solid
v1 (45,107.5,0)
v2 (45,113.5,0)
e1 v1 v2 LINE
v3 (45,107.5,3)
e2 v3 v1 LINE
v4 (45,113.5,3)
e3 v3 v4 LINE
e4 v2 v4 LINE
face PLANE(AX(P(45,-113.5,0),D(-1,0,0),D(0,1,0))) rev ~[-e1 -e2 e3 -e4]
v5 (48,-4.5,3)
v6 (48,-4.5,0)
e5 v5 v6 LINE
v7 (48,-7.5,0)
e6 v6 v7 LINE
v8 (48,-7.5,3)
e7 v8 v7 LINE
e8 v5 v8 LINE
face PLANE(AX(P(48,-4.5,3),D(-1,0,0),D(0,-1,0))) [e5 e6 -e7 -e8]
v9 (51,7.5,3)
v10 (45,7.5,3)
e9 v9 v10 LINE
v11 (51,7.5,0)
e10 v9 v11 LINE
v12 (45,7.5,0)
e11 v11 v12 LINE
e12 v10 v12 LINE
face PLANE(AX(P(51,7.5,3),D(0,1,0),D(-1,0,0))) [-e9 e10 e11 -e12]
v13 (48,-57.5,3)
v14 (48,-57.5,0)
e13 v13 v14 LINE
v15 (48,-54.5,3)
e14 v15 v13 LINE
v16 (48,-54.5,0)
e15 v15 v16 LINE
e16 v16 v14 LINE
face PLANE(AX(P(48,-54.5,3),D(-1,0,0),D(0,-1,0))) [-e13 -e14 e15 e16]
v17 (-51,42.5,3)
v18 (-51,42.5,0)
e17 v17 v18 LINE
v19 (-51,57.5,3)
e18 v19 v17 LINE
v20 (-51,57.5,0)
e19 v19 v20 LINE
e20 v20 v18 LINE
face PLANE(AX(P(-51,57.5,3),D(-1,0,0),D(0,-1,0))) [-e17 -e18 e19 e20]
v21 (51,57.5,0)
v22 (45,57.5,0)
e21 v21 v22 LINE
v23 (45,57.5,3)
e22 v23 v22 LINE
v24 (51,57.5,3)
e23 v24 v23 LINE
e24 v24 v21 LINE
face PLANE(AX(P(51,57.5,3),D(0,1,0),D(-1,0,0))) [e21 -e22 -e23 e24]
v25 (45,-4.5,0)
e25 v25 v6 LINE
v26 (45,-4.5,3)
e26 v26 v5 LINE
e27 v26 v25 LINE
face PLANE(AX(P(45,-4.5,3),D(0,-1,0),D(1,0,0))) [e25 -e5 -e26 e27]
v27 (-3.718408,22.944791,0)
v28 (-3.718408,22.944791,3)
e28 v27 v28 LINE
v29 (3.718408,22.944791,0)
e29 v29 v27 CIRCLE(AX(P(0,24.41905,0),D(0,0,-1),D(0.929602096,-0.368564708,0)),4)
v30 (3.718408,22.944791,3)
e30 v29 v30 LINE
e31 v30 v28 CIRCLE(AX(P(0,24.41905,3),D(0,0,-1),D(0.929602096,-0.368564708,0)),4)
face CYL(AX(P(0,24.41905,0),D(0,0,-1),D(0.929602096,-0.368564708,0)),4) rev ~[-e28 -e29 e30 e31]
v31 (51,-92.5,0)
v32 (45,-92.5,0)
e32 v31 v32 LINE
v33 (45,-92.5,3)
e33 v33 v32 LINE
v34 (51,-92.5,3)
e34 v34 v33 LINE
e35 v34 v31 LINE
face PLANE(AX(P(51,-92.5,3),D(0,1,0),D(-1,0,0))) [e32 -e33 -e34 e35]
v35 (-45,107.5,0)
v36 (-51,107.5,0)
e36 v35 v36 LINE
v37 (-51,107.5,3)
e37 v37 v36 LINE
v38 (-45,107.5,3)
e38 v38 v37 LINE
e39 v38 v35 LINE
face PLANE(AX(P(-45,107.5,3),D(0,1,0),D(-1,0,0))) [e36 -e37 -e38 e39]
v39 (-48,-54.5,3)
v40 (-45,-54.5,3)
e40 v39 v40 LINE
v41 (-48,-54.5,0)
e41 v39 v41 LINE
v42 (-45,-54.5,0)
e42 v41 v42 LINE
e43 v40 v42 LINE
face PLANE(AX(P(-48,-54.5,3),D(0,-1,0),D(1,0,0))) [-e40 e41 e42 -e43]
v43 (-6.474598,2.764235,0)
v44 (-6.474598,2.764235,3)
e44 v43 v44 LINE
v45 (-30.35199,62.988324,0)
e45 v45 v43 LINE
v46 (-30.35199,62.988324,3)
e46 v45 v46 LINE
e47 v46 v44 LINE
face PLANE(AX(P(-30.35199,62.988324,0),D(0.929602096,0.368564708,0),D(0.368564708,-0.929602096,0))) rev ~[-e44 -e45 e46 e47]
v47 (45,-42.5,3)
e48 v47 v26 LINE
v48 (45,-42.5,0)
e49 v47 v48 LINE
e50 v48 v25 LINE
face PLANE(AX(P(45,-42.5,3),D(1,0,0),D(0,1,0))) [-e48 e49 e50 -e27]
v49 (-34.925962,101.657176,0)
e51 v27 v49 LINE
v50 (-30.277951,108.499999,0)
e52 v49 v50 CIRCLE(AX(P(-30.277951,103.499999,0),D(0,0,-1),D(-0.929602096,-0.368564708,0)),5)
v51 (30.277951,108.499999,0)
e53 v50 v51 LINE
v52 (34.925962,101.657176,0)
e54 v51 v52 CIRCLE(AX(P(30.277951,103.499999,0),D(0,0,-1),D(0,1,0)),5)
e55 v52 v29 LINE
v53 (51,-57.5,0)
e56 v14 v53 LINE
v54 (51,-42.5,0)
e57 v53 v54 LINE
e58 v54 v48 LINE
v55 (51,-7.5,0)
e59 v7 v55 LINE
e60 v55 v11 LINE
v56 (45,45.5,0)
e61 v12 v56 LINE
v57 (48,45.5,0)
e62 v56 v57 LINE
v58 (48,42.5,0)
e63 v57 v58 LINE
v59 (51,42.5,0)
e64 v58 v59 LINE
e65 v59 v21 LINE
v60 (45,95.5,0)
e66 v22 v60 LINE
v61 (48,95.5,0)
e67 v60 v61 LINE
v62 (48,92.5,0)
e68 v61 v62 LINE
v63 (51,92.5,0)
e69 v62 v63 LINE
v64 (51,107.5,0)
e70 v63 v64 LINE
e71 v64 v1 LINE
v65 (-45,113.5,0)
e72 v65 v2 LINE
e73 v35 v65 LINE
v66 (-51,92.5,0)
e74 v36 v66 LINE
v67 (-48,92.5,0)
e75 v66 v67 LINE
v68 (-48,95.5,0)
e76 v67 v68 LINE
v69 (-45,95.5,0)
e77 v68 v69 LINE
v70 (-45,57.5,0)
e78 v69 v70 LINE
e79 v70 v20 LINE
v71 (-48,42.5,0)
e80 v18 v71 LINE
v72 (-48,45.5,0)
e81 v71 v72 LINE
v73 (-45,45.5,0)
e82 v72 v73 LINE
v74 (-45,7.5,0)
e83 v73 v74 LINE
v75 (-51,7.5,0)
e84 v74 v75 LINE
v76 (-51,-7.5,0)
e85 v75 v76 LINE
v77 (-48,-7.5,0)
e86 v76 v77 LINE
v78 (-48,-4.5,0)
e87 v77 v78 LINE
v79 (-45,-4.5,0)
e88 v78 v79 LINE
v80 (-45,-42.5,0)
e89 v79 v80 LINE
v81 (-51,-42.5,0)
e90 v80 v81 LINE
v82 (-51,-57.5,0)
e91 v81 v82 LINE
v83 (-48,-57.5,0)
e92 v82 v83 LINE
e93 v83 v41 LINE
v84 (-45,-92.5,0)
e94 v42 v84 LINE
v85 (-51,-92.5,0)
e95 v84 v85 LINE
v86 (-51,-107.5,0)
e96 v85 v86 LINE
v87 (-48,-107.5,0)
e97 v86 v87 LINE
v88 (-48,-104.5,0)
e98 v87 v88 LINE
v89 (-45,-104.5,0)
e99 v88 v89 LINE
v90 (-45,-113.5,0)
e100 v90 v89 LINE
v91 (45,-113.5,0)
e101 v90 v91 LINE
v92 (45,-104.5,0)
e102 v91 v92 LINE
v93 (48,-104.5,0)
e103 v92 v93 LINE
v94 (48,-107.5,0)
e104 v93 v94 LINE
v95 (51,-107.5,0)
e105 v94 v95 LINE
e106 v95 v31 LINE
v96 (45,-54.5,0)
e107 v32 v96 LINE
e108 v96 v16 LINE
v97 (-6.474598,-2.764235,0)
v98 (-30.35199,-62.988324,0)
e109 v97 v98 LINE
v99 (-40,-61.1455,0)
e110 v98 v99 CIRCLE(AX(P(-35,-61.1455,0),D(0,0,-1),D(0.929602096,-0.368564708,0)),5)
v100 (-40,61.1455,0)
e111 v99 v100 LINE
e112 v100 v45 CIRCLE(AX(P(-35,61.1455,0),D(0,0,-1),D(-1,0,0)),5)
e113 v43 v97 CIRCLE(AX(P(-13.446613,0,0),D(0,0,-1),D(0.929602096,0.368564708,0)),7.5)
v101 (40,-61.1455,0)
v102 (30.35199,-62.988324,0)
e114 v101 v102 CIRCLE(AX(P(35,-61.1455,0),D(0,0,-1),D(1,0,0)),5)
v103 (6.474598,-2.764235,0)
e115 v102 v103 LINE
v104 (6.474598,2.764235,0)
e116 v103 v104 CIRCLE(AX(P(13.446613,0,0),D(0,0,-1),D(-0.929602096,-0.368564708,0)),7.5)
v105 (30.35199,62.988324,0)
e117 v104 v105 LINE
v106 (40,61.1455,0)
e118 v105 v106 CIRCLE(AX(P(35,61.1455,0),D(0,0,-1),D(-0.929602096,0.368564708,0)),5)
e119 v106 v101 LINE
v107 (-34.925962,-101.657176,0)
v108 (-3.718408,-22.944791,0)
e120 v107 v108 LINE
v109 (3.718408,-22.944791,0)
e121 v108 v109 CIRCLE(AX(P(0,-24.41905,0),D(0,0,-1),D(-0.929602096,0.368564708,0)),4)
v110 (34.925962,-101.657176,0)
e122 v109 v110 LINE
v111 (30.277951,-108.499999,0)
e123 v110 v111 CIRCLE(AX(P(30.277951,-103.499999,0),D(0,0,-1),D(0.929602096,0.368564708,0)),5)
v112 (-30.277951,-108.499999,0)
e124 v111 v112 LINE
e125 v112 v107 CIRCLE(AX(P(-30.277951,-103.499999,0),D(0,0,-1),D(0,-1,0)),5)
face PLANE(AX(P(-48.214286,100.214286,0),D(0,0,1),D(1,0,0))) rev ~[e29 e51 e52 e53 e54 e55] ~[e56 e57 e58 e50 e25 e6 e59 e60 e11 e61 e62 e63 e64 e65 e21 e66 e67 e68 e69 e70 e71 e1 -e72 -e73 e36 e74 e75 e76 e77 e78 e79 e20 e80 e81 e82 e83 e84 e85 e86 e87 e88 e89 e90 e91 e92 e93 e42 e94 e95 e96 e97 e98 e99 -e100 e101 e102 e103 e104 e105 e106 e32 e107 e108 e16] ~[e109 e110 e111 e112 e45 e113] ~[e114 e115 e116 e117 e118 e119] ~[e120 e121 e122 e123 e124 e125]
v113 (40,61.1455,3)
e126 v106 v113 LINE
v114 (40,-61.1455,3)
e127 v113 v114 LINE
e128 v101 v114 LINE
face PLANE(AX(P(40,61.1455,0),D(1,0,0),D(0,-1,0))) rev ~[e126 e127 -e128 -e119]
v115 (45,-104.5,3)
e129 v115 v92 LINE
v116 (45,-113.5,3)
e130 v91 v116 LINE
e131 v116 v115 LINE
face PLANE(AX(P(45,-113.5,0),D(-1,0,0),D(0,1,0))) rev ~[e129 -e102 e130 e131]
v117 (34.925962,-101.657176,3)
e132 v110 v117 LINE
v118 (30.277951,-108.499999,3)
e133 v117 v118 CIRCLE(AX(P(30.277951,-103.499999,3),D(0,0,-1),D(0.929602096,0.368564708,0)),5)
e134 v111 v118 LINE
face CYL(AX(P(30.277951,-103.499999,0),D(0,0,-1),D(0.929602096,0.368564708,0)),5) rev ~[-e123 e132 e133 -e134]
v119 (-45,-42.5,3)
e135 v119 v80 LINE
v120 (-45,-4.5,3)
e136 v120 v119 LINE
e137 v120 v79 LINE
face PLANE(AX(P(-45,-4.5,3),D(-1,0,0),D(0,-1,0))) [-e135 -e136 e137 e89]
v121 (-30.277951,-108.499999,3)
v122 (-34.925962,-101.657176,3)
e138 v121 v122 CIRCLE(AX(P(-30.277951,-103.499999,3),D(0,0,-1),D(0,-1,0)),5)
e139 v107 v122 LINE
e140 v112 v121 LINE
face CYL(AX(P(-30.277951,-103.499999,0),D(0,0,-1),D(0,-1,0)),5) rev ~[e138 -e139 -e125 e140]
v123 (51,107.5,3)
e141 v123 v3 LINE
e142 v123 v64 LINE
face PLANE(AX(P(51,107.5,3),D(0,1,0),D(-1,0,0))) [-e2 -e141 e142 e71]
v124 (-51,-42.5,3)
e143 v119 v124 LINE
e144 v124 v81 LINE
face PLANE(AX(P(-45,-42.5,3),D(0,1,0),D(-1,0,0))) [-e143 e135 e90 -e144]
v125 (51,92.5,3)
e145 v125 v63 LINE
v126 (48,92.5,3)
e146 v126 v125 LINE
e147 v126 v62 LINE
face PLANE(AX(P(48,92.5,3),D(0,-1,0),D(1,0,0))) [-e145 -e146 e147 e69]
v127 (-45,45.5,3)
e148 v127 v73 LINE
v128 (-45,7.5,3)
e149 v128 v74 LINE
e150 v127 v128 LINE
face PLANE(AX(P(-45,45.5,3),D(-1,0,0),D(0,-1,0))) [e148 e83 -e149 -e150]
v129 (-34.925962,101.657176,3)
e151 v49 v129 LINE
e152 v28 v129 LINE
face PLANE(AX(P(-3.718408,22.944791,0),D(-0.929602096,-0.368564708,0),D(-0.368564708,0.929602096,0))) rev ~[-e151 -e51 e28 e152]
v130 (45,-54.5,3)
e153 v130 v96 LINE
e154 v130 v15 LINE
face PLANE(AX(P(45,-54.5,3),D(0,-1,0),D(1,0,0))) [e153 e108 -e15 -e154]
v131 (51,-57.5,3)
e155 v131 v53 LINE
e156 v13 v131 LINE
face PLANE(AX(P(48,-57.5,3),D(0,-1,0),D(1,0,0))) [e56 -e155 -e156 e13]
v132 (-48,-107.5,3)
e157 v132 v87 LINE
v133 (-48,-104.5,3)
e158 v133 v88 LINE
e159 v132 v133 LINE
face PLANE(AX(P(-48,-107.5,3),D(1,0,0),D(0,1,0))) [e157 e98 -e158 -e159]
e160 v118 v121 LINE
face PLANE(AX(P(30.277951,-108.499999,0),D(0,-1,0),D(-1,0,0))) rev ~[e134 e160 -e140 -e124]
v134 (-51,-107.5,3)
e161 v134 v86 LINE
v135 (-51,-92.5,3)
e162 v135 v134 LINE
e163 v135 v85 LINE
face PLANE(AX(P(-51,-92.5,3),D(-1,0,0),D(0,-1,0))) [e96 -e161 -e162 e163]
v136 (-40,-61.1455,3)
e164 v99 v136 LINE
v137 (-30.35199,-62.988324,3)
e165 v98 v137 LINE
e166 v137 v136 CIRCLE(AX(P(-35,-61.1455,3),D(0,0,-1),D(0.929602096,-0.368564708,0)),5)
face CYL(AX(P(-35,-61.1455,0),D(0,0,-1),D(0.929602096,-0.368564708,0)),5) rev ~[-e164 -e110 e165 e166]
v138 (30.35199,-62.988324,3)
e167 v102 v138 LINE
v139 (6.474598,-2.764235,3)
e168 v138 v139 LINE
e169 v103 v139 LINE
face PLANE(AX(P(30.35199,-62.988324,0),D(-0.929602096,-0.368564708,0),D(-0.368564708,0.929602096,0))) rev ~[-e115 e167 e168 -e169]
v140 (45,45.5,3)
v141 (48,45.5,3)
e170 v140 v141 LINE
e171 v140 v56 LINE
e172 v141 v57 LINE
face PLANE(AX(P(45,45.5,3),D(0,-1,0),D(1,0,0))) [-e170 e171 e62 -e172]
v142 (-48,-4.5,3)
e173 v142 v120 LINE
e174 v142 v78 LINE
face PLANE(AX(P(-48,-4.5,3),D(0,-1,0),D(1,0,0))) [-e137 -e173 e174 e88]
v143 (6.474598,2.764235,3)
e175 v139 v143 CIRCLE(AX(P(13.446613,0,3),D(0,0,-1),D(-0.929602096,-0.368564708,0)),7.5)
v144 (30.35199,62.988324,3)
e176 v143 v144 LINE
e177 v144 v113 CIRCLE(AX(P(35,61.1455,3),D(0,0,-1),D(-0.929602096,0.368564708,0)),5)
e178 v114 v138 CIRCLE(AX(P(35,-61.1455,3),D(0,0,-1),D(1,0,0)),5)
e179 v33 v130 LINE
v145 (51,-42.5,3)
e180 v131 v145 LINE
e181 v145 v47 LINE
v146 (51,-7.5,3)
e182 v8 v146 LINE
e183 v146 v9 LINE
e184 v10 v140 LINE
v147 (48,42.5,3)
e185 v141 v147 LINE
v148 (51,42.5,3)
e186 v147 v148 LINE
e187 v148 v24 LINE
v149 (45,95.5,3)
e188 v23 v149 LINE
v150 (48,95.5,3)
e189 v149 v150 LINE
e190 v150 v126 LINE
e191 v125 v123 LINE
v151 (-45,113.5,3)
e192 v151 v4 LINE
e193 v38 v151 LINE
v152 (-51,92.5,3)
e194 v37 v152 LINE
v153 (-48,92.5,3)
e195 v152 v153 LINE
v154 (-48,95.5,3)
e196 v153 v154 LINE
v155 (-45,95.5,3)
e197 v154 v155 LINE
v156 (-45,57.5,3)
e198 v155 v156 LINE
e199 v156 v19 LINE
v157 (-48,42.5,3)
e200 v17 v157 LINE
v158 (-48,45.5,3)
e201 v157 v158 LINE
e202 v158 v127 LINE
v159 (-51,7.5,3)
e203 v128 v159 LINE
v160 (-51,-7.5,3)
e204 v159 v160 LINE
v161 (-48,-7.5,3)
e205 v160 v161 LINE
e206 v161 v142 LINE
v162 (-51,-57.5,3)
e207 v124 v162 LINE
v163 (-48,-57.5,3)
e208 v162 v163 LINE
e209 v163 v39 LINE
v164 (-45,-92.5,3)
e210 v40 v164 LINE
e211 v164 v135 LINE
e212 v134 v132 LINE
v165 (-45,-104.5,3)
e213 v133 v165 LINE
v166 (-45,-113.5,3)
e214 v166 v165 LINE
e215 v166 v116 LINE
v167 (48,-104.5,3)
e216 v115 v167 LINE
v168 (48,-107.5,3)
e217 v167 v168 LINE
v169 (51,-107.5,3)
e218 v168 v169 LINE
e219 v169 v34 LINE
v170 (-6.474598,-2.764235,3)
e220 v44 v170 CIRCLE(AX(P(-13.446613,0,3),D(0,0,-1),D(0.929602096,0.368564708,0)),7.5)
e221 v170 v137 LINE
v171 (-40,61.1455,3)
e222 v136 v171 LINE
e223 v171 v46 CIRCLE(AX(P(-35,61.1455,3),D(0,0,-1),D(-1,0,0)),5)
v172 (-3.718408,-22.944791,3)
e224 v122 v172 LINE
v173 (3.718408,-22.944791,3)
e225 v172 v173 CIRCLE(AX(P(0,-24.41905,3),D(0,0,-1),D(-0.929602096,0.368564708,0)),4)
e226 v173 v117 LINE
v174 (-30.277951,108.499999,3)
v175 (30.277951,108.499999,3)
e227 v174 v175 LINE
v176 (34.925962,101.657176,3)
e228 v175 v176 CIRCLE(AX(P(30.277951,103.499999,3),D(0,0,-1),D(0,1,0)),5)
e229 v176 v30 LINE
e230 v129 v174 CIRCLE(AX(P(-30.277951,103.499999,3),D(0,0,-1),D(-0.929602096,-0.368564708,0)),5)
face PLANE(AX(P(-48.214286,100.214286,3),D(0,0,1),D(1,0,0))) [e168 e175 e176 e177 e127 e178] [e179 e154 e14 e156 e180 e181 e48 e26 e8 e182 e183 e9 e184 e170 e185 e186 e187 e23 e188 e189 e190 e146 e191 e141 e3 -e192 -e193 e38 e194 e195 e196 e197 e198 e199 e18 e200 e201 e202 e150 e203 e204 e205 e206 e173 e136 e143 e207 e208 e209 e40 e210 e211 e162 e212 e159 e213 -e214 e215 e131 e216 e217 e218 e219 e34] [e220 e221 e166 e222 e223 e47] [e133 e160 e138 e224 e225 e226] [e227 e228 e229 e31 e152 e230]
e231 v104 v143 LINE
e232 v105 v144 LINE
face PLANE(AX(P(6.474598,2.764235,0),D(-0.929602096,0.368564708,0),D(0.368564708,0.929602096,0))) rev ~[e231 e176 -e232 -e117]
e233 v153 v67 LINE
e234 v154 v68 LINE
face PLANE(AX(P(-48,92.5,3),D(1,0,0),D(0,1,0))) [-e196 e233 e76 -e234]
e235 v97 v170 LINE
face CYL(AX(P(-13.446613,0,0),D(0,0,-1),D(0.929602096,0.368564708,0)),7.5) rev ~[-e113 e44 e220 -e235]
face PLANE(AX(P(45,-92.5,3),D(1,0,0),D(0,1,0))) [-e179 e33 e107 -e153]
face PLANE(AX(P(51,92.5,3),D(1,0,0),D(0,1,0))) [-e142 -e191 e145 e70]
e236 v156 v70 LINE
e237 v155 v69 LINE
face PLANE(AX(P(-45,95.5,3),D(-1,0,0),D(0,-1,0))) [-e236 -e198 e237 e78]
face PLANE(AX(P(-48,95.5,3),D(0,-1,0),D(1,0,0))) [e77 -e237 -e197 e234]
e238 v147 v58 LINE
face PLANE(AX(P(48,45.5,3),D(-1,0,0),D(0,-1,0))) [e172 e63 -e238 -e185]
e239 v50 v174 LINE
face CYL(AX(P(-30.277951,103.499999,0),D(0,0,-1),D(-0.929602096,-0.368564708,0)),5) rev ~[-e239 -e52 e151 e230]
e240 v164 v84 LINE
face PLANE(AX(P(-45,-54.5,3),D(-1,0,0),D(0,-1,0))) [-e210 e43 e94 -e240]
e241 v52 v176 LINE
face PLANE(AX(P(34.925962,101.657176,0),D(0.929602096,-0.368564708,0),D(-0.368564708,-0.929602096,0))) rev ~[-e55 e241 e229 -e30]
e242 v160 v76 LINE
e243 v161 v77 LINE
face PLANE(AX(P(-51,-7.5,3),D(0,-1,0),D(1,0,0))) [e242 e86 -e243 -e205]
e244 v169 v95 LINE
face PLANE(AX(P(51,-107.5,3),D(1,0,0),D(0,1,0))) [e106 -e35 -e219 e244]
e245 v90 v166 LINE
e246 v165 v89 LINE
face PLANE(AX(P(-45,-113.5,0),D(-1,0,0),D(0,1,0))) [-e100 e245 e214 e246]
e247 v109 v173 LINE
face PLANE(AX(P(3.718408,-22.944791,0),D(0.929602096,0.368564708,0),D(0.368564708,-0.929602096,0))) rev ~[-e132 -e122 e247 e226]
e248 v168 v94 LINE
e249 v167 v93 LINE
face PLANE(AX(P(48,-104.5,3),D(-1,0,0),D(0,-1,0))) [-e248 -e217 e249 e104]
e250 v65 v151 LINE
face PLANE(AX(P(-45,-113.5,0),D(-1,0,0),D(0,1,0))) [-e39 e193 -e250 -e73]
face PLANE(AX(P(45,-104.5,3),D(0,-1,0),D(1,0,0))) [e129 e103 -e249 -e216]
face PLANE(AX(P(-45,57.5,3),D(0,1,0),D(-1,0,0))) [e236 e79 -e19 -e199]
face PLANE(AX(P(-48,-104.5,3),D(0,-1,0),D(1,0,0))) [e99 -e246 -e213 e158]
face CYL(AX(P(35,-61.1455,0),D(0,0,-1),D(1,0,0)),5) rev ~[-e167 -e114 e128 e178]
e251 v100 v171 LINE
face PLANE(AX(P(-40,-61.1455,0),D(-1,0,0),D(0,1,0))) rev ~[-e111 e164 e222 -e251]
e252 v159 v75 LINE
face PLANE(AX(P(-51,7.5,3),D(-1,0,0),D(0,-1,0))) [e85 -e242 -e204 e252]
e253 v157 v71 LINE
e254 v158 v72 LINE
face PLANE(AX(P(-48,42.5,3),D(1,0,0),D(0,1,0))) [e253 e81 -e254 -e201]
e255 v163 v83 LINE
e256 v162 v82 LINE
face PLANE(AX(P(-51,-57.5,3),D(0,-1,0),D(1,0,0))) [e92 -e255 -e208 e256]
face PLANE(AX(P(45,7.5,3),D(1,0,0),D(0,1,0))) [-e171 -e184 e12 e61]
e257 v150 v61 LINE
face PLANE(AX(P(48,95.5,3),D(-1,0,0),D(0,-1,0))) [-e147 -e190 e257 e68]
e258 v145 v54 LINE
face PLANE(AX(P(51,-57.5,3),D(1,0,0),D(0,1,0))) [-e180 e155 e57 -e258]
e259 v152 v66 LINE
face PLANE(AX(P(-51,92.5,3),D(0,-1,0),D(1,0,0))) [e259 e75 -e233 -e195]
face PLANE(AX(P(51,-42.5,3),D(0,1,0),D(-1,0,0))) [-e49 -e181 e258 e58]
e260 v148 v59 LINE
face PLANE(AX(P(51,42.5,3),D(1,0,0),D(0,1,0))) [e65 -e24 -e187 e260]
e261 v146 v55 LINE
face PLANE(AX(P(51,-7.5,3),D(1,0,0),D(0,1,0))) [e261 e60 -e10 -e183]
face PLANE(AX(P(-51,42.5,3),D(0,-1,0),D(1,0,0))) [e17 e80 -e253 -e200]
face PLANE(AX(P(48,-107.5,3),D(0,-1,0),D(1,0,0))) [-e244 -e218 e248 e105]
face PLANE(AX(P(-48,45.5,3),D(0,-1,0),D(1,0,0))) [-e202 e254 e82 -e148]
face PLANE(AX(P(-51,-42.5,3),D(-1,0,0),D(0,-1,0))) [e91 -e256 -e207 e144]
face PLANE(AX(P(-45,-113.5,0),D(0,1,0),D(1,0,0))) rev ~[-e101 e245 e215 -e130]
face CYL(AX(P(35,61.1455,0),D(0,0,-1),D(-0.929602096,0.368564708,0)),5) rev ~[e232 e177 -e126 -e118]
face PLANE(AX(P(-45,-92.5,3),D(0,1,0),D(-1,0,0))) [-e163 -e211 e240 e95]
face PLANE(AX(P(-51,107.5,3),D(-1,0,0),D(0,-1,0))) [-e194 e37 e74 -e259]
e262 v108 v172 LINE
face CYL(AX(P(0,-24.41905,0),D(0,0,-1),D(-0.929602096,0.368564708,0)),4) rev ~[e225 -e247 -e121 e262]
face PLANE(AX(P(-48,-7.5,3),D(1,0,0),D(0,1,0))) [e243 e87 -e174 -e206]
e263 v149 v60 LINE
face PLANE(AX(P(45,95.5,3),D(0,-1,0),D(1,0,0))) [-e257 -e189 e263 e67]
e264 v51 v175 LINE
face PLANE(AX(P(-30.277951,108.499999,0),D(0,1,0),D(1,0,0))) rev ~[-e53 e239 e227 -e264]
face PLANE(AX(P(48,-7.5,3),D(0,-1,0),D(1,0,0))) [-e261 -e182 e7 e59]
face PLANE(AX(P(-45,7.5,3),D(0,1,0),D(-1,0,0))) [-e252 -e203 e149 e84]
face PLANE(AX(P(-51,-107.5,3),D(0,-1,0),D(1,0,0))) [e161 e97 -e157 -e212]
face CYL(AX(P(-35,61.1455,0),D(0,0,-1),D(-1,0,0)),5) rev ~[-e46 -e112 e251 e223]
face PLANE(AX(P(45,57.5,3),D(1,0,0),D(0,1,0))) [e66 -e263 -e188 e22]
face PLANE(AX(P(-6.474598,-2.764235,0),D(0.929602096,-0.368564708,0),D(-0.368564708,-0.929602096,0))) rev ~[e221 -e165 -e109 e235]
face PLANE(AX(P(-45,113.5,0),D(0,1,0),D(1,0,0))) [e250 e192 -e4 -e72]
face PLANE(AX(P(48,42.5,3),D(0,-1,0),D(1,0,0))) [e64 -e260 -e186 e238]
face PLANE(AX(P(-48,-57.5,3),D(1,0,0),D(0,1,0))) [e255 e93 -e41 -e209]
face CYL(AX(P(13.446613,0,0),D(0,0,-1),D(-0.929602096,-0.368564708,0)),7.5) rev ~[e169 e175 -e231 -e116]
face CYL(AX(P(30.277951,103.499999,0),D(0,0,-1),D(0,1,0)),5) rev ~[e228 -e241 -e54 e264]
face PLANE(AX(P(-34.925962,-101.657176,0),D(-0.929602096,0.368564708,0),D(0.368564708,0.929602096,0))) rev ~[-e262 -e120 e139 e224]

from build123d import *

# Parameters (mm, degrees)
F0_W     = 90
F0_H     = 227
F1_DEPTH = 3
F3_DEPTH = 3


# Not quite as in the source:
# - a feature names something its author has since deleted; it is built from what else it names


with BuildPart() as f1:
    # F0 (on Top) → F1 (new body)
    with BuildSketch(Plane.XY):
        Rectangle(F0_W, F0_H)
        with BuildLine():
            ThreePointArc((-30.2779513906, -108.4999991059), (-34.4140194322, -106.3094369778), (-34.9259618692, -101.6571755682))
            Line((-34.9259618692, -101.6571755682), (-3.7184084714, -22.9447908871))
            ThreePointArc((-3.7184084714, -22.9447908871), (-8.85e-08, -20.4190497173), (3.7184082943, -22.9447908871))
            Line((3.7184082943, -22.9447908871), (34.9259616921, -101.6571755682))
            ThreePointArc((34.9259616921, -101.6571755682), (34.4140192551, -106.3094369778), (30.2779512136, -108.4999991059))
            Line((30.2779512136, -108.4999991059), (-30.2779513906, -108.4999991059))
        make_face(mode=Mode.SUBTRACT)
        with BuildLine():
            ThreePointArc((-40, 61.145500066), (-35.9380691891, 66.0567143962), (-30.3519895215, 62.9883236038))
            Line((-30.3519895215, 62.9883236038), (-6.4745976856, 2.7642353066))
            ThreePointArc((-6.4745976856, 2.7642353066), (-5.9466134034, 0), (-6.4745976856, -2.7642353066))
            Line((-6.4745976856, -2.7642353066), (-30.3519895215, -62.9883236038))
            ThreePointArc((-30.3519895214, -62.9883236038), (-35.9380691891, -66.0567143962), (-40, -61.145500066))
            Line((-40, -61.145500066), (-40, 61.145500066))
        make_face(mode=Mode.SUBTRACT)
        with BuildLine():
            ThreePointArc((30.2779512136, 108.4999991059), (34.4140192551, 106.3094369778), (34.9259616921, 101.6571755682))
            Line((34.9259616921, 101.6571755682), (3.7184082943, 22.9447908871))
            ThreePointArc((3.7184082943, 22.9447908871), (-8.85e-08, 20.4190497173), (-3.7184084714, 22.9447908871))
            Line((-3.7184084714, 22.9447908871), (-34.9259618692, 101.6571755682))
            ThreePointArc((-34.9259618692, 101.6571755682), (-34.4140194322, 106.3094369778), (-30.2779513906, 108.4999991059))
            Line((-30.2779513906, 108.4999991059), (30.2779512136, 108.4999991059))
        make_face(mode=Mode.SUBTRACT)
        with BuildLine():
            Line((6.4745976856, 2.7642353066), (30.3519895215, 62.9883236038))
            ThreePointArc((30.3519895215, 62.9883236038), (35.9380691891, 66.0567143962), (40, 61.145500066))
            Line((40, 61.145500066), (40, -61.145500066))
            ThreePointArc((40, -61.145500066), (35.9380691891, -66.0567143962), (30.3519895214, -62.9883236038))
            Line((30.3519895215, -62.9883236038), (6.4745976856, -2.7642353066))
            ThreePointArc((6.4745976856, -2.7642353066), (5.9466134034, 0), (6.4745976856, 2.7642353066))
        make_face(mode=Mode.SUBTRACT)
    extrude(amount=F1_DEPTH)

    # F2 (on face) → F3 (join, through all)
    with BuildSketch(Plane.XY.offset(3)):
        Polygon((-45, 95.5), (-45, 107.5), (-51, 107.5), (-51, 92.5), (-48, 92.5), (-48, 95.5), align=None)
        Polygon((51, 107.5), (45, 107.5), (45, 95.5), (48, 95.5), (48, 92.5), (51, 92.5), align=None)
        Polygon((-45, 45.5), (-45, 57.5), (-51, 57.5), (-51, 42.5), (-48, 42.5), (-48, 45.5), align=None)
        Polygon((51, 57.5), (45, 57.5), (45, 45.5), (48, 45.5), (48, 42.5), (51, 42.5), align=None)
        Polygon((-45, 113.5), (-45, 107.5), (-45, 95.5), (-45, 57.5), (-45, 45.5), (-45, 7.5), (-45, -4.5), (-45, -42.5), (-45, -54.5), (-45, -92.5), (-45, -104.5), (-45, -113.5), (45, -113.5), (45, -104.5), (45, -92.5), (45, -54.5), (45, -42.5), (45, -4.5), (45, 7.5), (45, 45.5), (45, 57.5), (45, 95.5), (45, 107.5), (45, 113.5), align=None)
        with BuildLine():
            Line((3.7184082943, -22.9447908871), (34.9259616921, -101.6571755682))
            ThreePointArc((34.9259616921, -101.6571755682), (34.4140192551, -106.3094369778), (30.2779512136, -108.4999991059))
            Line((30.2779512136, -108.4999991059), (-30.2779513906, -108.4999991059))
            ThreePointArc((-30.2779513906, -108.4999991059), (-34.4140194322, -106.3094369778), (-34.9259618692, -101.6571755682))
            Line((-34.9259618692, -101.6571755682), (-3.7184084714, -22.9447908871))
            ThreePointArc((-3.7184084714, -22.9447908871), (-8.85e-08, -20.4190497173), (3.7184082943, -22.9447908871))
        make_face(mode=Mode.SUBTRACT)
        with BuildLine():
            ThreePointArc((-30.3519895214, -62.9883236038), (-35.9380691891, -66.0567143962), (-40, -61.145500066))
            Line((-40, -61.145500066), (-40, 61.145500066))
            ThreePointArc((-40, 61.145500066), (-35.9380691891, 66.0567143962), (-30.3519895215, 62.9883236038))
            Line((-30.3519895215, 62.9883236038), (-6.4745976856, 2.7642353066))
            ThreePointArc((-6.4745976856, 2.7642353066), (-5.9466134034, 0), (-6.4745976856, -2.7642353066))
            Line((-6.4745976856, -2.7642353066), (-30.3519895215, -62.9883236038))
        make_face(mode=Mode.SUBTRACT)
        with BuildLine():
            ThreePointArc((-34.9259618692, 101.6571755682), (-34.4140194322, 106.3094369778), (-30.2779513906, 108.4999991059))
            Line((-30.2779513906, 108.4999991059), (30.2779512136, 108.4999991059))
            ThreePointArc((30.2779512136, 108.4999991059), (34.4140192551, 106.3094369778), (34.9259616921, 101.6571755682))
            Line((34.9259616921, 101.6571755682), (3.7184082943, 22.9447908871))
            ThreePointArc((3.7184082943, 22.9447908871), (-8.85e-08, 20.4190497173), (-3.7184084714, 22.9447908871))
            Line((-3.7184084714, 22.9447908871), (-34.9259618692, 101.6571755682))
        make_face(mode=Mode.SUBTRACT)
        with BuildLine():
            ThreePointArc((6.4745976856, -2.7642353066), (5.9466134034, 0), (6.4745976856, 2.7642353066))
            Line((6.4745976856, 2.7642353066), (30.3519895215, 62.9883236038))
            ThreePointArc((30.3519895215, 62.9883236038), (35.9380691891, 66.0567143962), (40, 61.145500066))
            Line((40, 61.145500066), (40, -61.145500066))
            ThreePointArc((40, -61.145500066), (35.9380691891, -66.0567143962), (30.3519895214, -62.9883236038))
            Line((30.3519895215, -62.9883236038), (6.4745976856, -2.7642353066))
        make_face(mode=Mode.SUBTRACT)
        Polygon((-45, -4.5), (-45, 7.5), (-51, 7.5), (-51, -7.5), (-48, -7.5), (-48, -4.5), align=None)
        Polygon((-45, -54.5), (-45, -42.5), (-51, -42.5), (-51, -57.5), (-48, -57.5), (-48, -54.5), align=None)
        Polygon((-45, -104.5), (-45, -92.5), (-51, -92.5), (-51, -107.5), (-48, -107.5), (-48, -104.5), align=None)
        Polygon((51, -92.5), (45, -92.5), (45, -104.5), (48, -104.5), (48, -107.5), (51, -107.5), align=None)
        Polygon((51, -42.5), (45, -42.5), (45, -54.5), (48, -54.5), (48, -57.5), (51, -57.5), align=None)
        Polygon((51, 7.5), (45, 7.5), (45, -4.5), (48, -4.5), (48, -7.5), (51, -7.5), align=None)
    extrude(amount=-F3_DEPTH)


solid = f1.part
